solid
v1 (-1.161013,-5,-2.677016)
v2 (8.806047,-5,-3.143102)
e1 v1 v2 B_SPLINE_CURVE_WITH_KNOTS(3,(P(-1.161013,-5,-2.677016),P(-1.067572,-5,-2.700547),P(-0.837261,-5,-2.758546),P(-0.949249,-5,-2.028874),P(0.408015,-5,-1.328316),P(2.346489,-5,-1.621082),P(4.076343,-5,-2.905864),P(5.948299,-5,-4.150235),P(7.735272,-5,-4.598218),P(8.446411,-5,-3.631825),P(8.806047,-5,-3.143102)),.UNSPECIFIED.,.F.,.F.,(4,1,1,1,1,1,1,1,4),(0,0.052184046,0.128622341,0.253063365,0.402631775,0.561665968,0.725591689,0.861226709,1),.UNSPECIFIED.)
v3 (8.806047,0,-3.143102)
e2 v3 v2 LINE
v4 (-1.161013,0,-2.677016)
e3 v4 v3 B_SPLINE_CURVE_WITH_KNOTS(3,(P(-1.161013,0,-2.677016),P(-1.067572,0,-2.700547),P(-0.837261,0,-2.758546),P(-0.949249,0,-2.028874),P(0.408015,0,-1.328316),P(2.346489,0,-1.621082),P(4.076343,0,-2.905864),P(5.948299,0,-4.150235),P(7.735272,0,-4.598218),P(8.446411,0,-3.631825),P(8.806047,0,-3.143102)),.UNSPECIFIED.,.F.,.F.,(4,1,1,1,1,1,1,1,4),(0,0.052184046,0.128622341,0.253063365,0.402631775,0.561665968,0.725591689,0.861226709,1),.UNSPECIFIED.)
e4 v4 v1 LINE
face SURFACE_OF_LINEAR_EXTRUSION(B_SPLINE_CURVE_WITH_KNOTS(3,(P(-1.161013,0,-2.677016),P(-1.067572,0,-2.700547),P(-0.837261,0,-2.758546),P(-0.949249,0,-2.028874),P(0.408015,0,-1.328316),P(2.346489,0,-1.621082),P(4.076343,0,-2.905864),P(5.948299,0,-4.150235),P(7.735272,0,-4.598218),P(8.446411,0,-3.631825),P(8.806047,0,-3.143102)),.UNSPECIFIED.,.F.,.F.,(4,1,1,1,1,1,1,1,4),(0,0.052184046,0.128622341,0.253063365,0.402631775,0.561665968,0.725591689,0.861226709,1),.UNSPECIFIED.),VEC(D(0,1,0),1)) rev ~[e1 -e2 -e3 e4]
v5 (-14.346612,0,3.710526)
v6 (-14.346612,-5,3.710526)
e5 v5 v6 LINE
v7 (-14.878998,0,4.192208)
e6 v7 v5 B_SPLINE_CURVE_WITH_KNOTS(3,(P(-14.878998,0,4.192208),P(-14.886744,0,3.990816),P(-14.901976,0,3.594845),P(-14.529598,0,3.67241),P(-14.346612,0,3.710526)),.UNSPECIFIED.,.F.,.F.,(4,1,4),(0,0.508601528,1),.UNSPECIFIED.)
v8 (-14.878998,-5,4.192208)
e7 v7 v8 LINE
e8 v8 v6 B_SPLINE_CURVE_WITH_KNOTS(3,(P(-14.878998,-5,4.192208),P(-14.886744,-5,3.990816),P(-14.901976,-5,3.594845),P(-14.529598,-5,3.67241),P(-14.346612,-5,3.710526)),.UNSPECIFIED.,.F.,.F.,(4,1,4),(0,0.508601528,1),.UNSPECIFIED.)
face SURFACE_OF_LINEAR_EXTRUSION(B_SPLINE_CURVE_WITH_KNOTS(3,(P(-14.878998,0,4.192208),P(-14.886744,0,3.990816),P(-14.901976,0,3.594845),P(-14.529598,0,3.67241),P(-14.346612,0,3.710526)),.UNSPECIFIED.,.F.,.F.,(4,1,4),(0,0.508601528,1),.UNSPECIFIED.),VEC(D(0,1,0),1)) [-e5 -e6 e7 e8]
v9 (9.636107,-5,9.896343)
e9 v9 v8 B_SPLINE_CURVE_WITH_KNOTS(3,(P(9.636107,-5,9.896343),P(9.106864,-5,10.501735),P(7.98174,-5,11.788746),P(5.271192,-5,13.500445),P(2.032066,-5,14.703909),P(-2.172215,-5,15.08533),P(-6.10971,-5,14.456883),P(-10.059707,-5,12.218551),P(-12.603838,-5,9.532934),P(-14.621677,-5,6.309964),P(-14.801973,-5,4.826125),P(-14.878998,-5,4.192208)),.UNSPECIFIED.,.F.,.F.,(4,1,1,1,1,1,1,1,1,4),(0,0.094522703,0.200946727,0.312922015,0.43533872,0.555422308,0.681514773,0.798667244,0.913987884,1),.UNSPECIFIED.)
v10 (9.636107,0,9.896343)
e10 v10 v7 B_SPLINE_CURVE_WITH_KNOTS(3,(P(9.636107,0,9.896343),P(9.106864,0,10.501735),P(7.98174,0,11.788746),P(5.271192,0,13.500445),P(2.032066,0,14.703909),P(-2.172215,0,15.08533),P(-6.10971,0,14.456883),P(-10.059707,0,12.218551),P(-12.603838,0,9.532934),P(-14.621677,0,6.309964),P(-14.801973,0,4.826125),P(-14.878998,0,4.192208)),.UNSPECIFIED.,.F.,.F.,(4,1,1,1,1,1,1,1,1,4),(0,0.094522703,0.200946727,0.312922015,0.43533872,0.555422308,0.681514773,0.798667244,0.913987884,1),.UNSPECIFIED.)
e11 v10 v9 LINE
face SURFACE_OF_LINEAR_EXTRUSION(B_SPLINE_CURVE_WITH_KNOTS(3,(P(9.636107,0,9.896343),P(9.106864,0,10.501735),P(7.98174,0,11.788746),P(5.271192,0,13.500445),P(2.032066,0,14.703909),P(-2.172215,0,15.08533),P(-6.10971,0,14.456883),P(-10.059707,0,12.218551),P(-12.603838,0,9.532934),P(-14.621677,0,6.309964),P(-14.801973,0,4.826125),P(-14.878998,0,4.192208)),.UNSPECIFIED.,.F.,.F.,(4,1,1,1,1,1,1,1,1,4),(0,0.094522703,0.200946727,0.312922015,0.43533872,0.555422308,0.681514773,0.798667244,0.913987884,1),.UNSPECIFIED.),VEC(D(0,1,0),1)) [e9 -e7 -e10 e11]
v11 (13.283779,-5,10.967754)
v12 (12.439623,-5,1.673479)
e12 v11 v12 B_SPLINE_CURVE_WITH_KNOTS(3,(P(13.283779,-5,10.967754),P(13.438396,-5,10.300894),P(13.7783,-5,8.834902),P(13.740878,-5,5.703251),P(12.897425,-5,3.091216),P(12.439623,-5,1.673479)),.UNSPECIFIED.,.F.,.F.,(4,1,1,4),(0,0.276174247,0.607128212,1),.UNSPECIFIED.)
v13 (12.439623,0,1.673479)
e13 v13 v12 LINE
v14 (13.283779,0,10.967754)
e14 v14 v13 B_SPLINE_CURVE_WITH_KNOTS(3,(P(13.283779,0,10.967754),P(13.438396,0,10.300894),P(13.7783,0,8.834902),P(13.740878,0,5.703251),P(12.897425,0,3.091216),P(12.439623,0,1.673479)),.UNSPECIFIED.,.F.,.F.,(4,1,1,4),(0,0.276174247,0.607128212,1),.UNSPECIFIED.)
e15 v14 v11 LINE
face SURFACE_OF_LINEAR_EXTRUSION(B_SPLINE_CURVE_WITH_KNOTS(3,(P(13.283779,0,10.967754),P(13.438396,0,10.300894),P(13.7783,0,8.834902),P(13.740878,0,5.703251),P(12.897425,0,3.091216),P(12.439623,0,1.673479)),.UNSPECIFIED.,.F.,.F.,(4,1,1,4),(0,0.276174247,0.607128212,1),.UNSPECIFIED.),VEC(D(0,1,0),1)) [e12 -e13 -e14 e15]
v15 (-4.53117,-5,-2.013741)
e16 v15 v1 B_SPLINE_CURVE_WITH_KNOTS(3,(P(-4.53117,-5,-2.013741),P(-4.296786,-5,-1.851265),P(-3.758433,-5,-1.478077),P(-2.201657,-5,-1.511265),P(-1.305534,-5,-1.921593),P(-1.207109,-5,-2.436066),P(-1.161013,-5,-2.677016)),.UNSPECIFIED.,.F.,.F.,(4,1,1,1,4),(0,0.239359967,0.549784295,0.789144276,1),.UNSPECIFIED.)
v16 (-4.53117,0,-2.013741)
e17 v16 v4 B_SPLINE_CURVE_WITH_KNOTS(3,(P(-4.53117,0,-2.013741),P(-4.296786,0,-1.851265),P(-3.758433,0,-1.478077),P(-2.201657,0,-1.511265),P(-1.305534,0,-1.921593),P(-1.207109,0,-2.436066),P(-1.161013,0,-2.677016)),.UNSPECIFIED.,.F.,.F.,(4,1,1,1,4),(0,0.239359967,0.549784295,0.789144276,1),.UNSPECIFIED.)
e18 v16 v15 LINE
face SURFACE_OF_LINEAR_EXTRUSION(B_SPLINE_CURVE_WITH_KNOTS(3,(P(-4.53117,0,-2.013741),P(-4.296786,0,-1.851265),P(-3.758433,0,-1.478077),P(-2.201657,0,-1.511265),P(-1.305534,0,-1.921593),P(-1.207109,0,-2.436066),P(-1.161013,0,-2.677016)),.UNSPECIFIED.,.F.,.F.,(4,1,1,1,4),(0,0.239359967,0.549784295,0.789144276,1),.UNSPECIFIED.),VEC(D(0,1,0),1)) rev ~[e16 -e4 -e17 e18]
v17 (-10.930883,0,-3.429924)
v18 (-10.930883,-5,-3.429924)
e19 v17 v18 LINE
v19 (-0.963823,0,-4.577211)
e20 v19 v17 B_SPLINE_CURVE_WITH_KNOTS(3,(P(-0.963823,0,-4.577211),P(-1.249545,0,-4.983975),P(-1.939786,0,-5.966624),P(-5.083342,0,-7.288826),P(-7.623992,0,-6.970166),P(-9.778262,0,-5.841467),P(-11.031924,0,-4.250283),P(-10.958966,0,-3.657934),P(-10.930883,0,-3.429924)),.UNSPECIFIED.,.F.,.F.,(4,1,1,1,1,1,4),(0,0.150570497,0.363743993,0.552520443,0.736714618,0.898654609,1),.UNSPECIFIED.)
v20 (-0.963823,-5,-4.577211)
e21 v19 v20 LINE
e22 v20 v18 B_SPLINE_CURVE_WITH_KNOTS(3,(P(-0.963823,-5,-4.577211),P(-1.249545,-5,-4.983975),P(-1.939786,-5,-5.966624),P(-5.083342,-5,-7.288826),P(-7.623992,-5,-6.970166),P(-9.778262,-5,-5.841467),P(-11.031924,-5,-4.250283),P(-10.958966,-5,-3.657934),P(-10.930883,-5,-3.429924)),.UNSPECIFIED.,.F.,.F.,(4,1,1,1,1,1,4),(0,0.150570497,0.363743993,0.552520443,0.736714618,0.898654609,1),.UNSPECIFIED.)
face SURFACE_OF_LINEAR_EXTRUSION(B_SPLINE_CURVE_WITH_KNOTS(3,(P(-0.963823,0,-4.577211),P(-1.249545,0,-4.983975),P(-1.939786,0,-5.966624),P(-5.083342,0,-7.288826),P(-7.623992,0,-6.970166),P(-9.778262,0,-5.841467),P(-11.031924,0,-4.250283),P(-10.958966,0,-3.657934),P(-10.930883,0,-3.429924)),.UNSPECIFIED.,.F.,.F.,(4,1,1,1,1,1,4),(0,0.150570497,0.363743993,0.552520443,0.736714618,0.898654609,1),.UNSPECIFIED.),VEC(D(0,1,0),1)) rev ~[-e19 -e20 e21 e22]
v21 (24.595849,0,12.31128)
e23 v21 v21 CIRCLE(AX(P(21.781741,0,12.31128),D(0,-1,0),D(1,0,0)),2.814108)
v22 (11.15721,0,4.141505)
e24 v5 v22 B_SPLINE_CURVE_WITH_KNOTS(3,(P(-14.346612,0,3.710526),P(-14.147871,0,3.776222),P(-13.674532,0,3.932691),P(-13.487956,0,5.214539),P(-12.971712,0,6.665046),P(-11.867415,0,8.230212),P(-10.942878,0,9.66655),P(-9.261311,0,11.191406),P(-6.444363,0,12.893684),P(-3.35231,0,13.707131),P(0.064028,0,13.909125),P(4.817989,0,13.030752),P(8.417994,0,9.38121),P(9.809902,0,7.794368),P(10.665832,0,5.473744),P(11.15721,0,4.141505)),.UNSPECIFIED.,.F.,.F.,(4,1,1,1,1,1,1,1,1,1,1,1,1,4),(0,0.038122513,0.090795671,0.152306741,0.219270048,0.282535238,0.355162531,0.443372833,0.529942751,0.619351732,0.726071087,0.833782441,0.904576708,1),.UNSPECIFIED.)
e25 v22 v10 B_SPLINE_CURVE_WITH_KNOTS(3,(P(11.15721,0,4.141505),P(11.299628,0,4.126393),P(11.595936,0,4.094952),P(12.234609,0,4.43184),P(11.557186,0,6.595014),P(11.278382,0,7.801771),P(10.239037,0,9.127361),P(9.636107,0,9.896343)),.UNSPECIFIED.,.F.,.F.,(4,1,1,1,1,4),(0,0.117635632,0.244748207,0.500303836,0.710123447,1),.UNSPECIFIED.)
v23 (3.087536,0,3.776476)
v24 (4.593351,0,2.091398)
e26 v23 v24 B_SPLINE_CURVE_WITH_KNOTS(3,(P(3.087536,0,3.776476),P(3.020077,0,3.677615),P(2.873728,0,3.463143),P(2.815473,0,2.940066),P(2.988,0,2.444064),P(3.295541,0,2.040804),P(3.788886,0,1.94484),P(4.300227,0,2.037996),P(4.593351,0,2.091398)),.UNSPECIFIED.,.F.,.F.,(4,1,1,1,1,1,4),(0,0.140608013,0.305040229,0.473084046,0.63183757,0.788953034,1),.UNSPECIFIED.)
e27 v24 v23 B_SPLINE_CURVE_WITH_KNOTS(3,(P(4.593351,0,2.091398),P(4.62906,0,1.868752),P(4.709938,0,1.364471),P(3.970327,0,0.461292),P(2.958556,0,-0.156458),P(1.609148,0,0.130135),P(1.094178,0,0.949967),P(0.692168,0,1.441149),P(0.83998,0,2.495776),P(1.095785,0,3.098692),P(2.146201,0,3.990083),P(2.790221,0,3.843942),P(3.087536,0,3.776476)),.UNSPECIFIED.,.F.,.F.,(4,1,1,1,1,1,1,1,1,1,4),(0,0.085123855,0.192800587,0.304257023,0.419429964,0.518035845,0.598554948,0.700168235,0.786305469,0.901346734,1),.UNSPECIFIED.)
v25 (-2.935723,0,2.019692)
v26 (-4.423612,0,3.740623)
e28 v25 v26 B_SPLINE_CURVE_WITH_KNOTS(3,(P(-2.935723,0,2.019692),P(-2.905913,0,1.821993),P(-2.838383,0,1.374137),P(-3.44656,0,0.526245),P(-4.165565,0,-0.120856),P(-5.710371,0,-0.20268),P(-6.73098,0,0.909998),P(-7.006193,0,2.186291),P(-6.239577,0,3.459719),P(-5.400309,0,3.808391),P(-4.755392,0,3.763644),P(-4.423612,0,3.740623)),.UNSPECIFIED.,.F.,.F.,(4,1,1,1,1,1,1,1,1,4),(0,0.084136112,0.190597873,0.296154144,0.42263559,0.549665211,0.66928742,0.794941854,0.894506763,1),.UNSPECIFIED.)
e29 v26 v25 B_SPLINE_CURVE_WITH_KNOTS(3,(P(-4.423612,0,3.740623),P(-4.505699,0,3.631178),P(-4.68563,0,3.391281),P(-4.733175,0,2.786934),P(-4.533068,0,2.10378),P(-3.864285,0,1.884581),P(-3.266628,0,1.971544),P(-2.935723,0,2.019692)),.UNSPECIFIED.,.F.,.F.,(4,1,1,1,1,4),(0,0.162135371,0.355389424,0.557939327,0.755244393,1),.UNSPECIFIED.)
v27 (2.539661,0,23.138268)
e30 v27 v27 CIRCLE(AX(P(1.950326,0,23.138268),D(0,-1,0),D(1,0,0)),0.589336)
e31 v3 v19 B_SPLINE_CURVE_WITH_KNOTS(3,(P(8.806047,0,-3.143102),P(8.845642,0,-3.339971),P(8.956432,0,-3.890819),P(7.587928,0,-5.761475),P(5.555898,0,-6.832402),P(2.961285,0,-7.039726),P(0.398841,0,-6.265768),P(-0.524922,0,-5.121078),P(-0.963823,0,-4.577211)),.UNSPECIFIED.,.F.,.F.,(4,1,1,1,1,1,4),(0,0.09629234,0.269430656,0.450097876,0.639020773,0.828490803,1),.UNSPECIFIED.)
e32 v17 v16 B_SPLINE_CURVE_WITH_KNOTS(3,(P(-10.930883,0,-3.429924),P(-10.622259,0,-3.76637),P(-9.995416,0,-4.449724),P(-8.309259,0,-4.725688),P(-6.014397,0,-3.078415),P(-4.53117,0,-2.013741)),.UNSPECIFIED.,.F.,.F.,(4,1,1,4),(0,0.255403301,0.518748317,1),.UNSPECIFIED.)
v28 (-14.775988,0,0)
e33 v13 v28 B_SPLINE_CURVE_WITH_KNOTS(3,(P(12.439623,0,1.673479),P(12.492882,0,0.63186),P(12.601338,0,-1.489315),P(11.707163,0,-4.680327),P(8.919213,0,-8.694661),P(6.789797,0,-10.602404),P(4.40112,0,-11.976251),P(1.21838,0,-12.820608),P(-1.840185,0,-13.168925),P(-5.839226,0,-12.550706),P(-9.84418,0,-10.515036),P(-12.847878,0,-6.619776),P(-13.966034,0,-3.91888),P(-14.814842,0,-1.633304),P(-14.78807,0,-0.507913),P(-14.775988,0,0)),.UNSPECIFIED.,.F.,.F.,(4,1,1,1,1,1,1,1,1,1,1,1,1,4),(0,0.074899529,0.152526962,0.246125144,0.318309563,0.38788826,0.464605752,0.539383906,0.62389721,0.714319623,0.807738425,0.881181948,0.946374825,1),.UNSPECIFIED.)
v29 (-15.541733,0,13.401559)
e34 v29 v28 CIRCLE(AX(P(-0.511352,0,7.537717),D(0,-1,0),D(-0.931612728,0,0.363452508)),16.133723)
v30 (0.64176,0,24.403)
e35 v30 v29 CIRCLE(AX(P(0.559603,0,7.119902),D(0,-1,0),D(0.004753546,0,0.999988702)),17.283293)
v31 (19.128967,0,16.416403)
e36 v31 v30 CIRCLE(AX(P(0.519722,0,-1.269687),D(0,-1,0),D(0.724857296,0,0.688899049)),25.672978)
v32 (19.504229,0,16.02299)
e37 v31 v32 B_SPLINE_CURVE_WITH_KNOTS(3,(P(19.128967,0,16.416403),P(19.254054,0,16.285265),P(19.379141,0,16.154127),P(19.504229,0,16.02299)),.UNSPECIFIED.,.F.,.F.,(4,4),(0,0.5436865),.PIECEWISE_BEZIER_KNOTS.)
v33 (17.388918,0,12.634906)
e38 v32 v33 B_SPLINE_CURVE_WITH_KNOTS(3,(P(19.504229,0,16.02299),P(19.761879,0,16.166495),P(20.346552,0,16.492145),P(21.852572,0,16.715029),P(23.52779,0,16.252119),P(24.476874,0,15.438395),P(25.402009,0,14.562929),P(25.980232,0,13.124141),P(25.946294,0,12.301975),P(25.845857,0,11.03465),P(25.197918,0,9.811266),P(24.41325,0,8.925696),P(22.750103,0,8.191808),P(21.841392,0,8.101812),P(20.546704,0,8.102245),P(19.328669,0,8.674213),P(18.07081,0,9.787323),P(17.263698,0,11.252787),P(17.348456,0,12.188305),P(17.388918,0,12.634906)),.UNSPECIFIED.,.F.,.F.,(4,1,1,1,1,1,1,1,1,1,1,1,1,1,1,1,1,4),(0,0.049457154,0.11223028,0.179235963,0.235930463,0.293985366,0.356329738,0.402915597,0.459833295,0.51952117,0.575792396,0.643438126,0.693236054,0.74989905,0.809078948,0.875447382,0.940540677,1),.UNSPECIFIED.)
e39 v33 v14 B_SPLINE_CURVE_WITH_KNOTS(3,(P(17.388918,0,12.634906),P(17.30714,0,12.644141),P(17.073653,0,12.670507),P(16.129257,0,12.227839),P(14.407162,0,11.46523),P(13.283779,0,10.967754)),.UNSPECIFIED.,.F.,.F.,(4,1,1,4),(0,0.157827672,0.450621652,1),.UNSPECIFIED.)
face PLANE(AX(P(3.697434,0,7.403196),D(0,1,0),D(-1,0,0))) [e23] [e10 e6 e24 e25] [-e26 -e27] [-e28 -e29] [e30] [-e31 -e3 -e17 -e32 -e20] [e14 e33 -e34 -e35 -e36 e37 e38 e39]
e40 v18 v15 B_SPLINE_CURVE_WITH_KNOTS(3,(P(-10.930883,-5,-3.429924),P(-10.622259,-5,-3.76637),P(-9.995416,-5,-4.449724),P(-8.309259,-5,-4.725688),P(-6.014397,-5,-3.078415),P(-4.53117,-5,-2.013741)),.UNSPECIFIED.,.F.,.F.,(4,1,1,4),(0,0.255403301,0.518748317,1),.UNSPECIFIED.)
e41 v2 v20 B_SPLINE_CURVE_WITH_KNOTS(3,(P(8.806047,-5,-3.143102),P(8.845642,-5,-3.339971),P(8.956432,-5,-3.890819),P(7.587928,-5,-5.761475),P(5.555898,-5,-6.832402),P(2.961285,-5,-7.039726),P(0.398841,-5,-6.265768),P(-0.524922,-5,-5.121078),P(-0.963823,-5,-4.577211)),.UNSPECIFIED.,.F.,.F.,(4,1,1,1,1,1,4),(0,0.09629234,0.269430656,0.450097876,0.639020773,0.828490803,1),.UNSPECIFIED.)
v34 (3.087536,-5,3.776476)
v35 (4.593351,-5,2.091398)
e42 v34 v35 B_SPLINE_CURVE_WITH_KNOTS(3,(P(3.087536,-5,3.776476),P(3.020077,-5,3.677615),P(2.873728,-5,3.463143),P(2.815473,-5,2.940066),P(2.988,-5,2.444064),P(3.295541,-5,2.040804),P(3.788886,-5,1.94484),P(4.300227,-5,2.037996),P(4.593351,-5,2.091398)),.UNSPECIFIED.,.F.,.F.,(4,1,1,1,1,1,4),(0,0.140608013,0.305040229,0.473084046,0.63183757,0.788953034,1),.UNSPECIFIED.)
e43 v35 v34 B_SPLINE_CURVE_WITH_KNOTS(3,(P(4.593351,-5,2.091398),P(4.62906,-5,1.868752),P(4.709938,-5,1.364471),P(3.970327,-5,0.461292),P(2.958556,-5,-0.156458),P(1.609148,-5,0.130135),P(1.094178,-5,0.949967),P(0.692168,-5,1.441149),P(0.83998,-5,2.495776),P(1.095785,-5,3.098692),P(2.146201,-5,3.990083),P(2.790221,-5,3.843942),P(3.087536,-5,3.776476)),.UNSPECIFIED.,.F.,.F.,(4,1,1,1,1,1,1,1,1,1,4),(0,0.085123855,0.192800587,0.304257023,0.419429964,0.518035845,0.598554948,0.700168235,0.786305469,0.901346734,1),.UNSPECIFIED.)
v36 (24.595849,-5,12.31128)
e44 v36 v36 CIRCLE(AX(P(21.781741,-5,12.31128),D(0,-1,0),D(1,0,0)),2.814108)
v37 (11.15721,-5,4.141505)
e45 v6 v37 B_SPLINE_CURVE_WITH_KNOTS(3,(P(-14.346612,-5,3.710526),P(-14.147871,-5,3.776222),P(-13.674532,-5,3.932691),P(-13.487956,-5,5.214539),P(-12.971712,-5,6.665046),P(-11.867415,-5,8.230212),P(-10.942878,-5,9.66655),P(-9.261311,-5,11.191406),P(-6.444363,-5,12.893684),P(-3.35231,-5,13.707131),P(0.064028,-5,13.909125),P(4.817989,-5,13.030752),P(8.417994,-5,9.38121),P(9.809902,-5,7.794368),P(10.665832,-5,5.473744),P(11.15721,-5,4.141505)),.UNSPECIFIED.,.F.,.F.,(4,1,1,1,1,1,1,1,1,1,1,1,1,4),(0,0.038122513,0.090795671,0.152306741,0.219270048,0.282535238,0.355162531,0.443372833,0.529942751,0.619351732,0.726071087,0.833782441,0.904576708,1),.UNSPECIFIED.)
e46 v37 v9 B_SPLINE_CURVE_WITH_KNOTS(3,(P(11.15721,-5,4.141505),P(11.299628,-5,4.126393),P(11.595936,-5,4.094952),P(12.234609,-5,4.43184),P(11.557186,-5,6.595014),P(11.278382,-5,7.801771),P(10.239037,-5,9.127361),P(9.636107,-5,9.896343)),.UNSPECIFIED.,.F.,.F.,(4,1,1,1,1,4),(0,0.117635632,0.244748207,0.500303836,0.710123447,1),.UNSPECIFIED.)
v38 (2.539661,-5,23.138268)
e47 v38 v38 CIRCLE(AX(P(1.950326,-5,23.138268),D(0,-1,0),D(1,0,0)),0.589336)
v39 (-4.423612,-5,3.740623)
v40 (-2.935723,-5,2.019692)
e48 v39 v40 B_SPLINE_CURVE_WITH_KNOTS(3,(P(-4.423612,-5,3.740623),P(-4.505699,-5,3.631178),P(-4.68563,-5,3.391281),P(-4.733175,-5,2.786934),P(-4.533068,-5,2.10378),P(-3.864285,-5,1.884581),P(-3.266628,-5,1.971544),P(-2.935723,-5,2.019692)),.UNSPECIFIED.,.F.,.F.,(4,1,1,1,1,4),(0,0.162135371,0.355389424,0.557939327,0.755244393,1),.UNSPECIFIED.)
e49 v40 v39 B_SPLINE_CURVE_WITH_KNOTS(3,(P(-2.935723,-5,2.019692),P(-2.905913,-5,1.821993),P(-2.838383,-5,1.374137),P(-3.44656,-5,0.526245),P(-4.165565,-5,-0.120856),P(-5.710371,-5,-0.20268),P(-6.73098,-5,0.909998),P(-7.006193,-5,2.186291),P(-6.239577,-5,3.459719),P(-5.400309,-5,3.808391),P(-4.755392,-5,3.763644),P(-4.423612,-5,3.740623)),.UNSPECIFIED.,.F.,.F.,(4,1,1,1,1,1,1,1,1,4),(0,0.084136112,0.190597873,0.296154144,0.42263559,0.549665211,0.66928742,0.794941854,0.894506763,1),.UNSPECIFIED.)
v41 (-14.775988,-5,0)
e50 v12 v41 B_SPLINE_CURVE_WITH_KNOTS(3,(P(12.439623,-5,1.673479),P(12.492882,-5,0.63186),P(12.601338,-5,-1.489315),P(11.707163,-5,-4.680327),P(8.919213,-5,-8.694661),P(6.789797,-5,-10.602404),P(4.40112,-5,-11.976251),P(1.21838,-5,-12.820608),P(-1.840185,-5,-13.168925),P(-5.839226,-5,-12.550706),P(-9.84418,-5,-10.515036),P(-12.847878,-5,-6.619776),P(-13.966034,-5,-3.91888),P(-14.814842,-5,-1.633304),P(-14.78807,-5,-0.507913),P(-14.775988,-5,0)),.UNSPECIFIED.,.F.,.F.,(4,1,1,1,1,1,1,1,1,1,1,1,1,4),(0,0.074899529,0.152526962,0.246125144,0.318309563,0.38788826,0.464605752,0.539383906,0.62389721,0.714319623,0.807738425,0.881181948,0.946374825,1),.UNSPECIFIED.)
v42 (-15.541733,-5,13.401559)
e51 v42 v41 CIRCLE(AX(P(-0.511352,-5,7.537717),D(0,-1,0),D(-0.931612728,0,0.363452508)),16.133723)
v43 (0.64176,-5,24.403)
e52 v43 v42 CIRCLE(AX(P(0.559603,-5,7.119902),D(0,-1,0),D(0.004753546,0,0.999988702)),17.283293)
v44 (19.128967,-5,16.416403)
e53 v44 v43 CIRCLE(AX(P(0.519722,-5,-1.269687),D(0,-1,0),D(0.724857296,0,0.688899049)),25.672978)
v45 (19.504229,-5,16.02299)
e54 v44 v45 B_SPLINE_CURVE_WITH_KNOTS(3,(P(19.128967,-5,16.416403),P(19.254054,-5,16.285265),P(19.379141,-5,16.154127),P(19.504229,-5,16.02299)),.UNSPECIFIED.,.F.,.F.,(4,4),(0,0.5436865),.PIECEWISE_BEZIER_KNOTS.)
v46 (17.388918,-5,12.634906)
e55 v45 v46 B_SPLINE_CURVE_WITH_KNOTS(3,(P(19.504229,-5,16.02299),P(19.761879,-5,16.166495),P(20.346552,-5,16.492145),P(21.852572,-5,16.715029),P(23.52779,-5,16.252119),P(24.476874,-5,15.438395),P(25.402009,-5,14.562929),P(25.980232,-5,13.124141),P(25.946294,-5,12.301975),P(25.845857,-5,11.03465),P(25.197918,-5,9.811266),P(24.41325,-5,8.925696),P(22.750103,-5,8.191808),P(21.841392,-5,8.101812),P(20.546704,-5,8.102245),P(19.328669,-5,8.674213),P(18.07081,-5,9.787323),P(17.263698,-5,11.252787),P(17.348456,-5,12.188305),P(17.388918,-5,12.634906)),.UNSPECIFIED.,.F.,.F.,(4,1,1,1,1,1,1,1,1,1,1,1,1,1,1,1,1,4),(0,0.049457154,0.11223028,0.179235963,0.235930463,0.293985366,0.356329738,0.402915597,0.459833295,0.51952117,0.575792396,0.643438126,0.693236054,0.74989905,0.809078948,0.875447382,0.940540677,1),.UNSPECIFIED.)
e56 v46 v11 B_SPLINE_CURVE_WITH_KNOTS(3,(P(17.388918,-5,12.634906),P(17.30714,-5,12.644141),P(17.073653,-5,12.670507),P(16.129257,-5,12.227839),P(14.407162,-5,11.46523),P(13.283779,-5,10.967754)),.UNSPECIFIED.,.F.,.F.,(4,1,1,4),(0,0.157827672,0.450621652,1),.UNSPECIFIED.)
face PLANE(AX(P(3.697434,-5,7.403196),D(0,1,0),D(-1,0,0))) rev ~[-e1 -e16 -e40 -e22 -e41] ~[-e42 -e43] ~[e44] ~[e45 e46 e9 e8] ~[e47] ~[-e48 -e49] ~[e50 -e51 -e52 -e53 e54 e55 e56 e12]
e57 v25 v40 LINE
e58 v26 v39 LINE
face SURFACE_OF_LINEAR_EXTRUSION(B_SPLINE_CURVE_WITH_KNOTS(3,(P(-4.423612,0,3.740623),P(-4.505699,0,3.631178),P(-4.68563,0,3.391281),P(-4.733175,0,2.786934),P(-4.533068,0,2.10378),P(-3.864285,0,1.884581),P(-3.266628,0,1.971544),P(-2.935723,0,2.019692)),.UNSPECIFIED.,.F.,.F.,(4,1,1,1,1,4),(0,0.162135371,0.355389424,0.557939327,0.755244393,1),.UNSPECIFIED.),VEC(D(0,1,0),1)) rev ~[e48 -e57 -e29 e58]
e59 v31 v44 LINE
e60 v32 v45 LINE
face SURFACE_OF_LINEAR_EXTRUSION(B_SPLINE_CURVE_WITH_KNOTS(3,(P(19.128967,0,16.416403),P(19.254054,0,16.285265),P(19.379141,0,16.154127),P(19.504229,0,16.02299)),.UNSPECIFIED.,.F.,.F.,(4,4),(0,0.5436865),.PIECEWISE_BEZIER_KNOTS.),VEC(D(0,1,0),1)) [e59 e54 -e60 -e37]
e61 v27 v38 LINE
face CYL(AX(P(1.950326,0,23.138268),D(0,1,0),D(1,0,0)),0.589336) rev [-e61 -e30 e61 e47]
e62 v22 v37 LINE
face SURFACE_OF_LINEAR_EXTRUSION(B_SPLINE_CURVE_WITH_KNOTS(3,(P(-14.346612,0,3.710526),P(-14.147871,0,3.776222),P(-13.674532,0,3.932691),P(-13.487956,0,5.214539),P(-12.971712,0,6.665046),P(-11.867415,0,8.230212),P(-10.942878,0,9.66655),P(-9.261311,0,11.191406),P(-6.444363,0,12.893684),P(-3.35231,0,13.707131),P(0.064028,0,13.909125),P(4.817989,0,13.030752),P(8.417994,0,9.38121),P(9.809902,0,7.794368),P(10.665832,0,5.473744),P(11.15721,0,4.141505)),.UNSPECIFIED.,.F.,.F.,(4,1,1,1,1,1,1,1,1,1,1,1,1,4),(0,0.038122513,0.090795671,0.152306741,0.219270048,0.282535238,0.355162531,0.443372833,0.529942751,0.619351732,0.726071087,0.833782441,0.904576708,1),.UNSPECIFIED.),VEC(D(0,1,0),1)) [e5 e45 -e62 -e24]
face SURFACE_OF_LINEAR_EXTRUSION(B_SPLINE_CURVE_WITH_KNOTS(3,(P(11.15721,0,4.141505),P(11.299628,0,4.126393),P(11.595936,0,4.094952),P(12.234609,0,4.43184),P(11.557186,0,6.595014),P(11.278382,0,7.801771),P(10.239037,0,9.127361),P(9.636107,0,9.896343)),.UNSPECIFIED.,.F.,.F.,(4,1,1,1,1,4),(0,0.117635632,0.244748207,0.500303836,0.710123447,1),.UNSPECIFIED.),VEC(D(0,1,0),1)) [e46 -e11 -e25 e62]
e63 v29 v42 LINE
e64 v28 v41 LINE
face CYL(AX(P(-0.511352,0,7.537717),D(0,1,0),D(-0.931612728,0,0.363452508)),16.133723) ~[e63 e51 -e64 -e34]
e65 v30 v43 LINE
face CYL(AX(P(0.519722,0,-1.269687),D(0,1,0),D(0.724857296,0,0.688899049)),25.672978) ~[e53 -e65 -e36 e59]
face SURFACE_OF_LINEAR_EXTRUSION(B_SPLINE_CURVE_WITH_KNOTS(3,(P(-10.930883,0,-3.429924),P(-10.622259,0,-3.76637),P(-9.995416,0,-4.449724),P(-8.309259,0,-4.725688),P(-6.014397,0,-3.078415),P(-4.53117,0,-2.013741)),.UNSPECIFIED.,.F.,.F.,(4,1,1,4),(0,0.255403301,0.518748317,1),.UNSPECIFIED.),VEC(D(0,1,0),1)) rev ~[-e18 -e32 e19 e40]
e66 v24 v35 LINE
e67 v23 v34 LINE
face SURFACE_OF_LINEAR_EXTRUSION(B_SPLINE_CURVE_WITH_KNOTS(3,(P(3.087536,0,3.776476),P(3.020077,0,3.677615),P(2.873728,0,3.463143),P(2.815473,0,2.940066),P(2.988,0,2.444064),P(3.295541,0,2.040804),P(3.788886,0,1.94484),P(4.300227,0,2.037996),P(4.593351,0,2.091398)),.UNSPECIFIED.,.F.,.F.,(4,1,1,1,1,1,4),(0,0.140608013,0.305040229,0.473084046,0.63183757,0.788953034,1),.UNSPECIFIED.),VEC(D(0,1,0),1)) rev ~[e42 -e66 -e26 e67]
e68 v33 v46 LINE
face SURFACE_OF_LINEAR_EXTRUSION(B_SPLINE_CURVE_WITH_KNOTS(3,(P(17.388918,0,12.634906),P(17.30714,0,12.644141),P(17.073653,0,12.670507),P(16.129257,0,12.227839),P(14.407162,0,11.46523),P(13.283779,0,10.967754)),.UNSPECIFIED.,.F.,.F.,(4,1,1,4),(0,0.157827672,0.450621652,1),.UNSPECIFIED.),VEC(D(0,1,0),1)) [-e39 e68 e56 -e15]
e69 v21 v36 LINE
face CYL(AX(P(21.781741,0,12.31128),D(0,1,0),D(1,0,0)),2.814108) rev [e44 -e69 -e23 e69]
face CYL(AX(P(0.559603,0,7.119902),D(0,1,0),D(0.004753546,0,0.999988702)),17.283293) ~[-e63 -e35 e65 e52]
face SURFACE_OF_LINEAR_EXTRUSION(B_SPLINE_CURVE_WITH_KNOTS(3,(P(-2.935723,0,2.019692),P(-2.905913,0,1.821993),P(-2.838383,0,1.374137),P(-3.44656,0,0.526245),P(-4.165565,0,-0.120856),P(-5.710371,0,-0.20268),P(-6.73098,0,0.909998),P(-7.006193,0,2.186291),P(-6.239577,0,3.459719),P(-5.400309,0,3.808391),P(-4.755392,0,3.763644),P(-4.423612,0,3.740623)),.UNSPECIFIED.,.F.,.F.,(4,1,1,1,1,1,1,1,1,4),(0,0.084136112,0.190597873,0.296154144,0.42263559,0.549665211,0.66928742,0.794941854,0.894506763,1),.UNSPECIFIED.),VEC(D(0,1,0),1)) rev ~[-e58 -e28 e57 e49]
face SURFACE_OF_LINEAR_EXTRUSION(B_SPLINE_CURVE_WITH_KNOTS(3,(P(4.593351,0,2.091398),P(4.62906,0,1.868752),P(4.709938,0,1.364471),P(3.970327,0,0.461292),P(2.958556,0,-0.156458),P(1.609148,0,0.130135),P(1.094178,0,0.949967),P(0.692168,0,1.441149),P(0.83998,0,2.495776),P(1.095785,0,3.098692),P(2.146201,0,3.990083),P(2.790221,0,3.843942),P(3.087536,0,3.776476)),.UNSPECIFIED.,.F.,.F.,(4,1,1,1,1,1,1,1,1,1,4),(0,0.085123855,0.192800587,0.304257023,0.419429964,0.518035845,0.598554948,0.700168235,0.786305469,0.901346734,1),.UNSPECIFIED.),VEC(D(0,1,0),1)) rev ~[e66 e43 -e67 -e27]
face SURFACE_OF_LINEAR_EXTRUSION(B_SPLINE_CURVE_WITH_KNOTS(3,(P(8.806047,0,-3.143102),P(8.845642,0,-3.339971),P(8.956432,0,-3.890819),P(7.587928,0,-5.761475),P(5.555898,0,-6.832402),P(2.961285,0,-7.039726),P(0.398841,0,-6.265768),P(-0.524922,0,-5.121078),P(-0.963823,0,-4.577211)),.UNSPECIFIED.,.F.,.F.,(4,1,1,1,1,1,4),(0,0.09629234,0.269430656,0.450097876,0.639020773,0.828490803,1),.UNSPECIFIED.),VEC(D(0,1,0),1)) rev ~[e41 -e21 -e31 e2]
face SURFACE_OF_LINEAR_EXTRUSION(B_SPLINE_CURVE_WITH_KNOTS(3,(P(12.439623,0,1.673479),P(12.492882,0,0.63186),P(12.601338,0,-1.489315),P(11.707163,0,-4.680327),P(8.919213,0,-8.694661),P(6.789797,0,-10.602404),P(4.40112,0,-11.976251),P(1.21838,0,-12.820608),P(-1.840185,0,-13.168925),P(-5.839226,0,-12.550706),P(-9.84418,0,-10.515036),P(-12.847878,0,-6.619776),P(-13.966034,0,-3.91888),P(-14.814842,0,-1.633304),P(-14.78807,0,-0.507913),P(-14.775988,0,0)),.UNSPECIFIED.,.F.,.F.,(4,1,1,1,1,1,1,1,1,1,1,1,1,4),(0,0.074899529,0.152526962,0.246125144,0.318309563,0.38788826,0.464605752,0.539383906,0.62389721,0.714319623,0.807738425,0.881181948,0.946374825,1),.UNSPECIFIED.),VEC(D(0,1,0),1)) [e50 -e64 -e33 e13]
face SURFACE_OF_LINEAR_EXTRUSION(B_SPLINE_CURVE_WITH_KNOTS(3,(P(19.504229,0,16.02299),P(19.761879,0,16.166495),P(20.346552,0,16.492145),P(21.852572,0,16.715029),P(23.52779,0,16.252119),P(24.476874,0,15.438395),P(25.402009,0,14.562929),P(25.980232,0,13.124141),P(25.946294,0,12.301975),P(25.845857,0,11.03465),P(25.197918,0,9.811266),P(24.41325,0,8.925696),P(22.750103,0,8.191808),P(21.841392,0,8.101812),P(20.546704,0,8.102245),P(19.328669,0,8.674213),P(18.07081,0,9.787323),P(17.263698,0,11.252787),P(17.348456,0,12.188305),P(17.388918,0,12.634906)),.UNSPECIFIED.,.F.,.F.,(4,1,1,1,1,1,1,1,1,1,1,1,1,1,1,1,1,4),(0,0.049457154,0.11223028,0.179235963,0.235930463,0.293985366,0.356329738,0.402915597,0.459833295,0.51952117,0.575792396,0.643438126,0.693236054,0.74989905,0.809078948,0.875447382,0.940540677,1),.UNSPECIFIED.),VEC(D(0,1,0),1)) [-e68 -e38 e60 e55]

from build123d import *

# Parameters (mm, degrees)
F0_R     = 0.5893357482
F0_R_2   = 2.8141081842
F1_DEPTH = 5


# Not quite as in the source:
# - a feature names something its author has since deleted; it is built from what else it names


with BuildPart() as f1:
    # F0 (on Front) → F1 (new body)
    with BuildSketch(Plane.XZ):
        with BuildLine():
            add(Edge.make_bspline(
                [(19.1289670765, 16.4164025337), (19.2540542533, 16.2852648646), (19.3791414301, 16.1541271955), (19.5042286068, 16.0229895264)],
                knots=[0, 0, 0, 0, 0.5436865001, 0.5436865001, 0.5436865001, 0.5436865001], degree=3))
            ThreePointArc((19.1289670765, 16.4164025337), (10.7011596535, 22.2980895198), (0.6417595432, 24.4030002505))
            ThreePointArc((0.6417595432, 24.4030002505), (-9.1569529923, 21.4132843748), (-15.5417332426, 13.4015586227))
            ThreePointArc((-15.5417332426, 13.4015586227), (-16.6188020545, 6.6173603775), (-14.7759877145, 0))
            add(Edge.make_bspline(
                [(12.4396234751, 1.6734787496), (12.4928817934, 0.6318597564), (12.6013381428, -1.4893148701), (11.7071630604, -4.680326801), (8.9192131429, -8.6946605769), (6.7897968532, -10.6024037966), (4.4011204199, -11.9762510792), (1.2183804488, -12.8206077461), (-1.8401849358, -13.1689252028), (-5.8392255545, -12.550705577), (-9.8441803584, -10.5150355339), (-12.8478780093, -6.6197758149), (-13.9660340579, -3.9188799674), (-14.8148420498, -1.6333036058), (-14.7880703609, -0.5079132017), (-14.7759877145, 0)],
                knots=[0, 0, 0, 0, 0.0748995289, 0.1525269617, 0.2461251435, 0.3183095626, 0.3878882602, 0.4646057524, 0.5393839055, 0.6238972099, 0.7143196234, 0.8077384253, 0.8811819485, 0.9463748254, 1, 1, 1, 1], degree=3))
            add(Edge.make_bspline(
                [(13.2837789133, 10.9677538276), (13.4383964182, 10.3008942014), (13.7783001215, 8.8349019993), (13.7408778209, 5.7032512612), (12.8974252548, 3.0912162071), (12.4396234751, 1.6734787496)],
                knots=[0, 0, 0, 0, 0.2761742468, 0.6071282117, 1, 1, 1, 1], degree=3))
            add(Edge.make_bspline(
                [(17.3889175057, 12.6349059865), (17.3071399145, 12.6441407774), (17.0736526382, 12.6705074893), (16.1292568481, 12.2278389528), (14.4071616214, 11.4652301296), (13.2837789133, 10.9677538276)],
                knots=[0, 0, 0, 0, 0.157827672, 0.4506216522, 1, 1, 1, 1], degree=3))
            add(Edge.make_bspline(
                [(19.5042286068, 16.0229895264), (19.7618793826, 16.1664952467), (20.3465515008, 16.4921445415), (21.8525723701, 16.715028554), (23.5277898319, 16.2521187136), (24.4768736198, 15.4383952236), (25.4020094443, 14.5629290823), (25.9802324209, 13.1241412335), (25.9462940214, 12.3019745652), (25.8458566723, 11.0346500909), (25.1979175637, 9.8112660026), (24.4132495686, 8.9256962736), (22.7501028456, 8.1918078917), (21.8413916583, 8.1018117524), (20.5467040461, 8.1022445142), (19.3286692564, 8.6742125966), (18.0708096962, 9.787323101), (17.2636977855, 11.2527872126), (17.3484555674, 12.1883053668), (17.3889175057, 12.6349059865)],
                knots=[0, 0, 0, 0, 0.0494571537, 0.1122302804, 0.179235963, 0.2359304627, 0.293985366, 0.3563297379, 0.4029155974, 0.4598332953, 0.5195211699, 0.5757923961, 0.6434381262, 0.6932360544, 0.7498990502, 0.8090789477, 0.8754473822, 0.9405406768, 1, 1, 1, 1], degree=3))
        make_face()
        with BuildLine():
            add(Edge.make_bspline(
                [(-0.9638228221, -4.5772111043), (-1.2495453437, -4.98397497), (-1.9397858162, -5.9666237341), (-5.0833422127, -7.2888256569), (-7.6239923855, -6.970166186), (-9.7782624226, -5.8414669289), (-11.0319235293, -4.2502833325), (-10.9589660125, -3.6579344108), (-10.9308827668, -3.4299239051)],
                knots=[0, 0, 0, 0, 0.150570497, 0.3637439933, 0.5525204428, 0.7367146178, 0.8986546089, 1, 1, 1, 1], degree=3))
            add(Edge.make_bspline(
                [(-10.9308827668, -3.4299239051), (-10.6222594198, -3.7663698968), (-9.995416145, -4.4497236006), (-8.3092593265, -4.7256884897), (-6.0143972146, -3.0784152173), (-4.5311697759, -2.0137408283)],
                knots=[0, 0, 0, 0, 0.2554033012, 0.5187483166, 1, 1, 1, 1], degree=3))
            add(Edge.make_bspline(
                [(-4.5311697759, -2.0137408283), (-4.2967863236, -1.8512654848), (-3.7584325512, -1.4780769629), (-2.2016565057, -1.5112649146), (-1.3055335554, -1.9215931489), (-1.2071093018, -2.436066182), (-1.161012915, -2.6770164259)],
                knots=[0, 0, 0, 0, 0.2393599669, 0.5497842955, 0.7891442761, 1, 1, 1, 1], degree=3))
            add(Edge.make_bspline(
                [(-1.161012915, -2.6770164259), (-1.0675721443, -2.7005474096), (-0.8372609343, -2.7585461751), (-0.9492487174, -2.0288737658), (0.4080149613, -1.3283155357), (2.3464888317, -1.621081544), (4.0763433279, -2.9058644961), (5.9482987592, -4.1502345757), (7.7352715038, -4.5982184912), (8.4464108727, -3.6318248378), (8.8060470298, -3.1431019306)],
                knots=[0, 0, 0, 0, 0.0521840457, 0.1286223414, 0.2530633649, 0.402631775, 0.5616659676, 0.7255916889, 0.8612267092, 1, 1, 1, 1], degree=3))
            add(Edge.make_bspline(
                [(8.8060470298, -3.1431019306), (8.8456422518, -3.3399706171), (8.9564316104, -3.8908187855), (7.5879277489, -5.7614752214), (5.5558981074, -6.8324022566), (2.9612847768, -7.0397264538), (0.3988413132, -6.2657680799), (-0.5249223295, -5.1210784221), (-0.9638228221, -4.5772111043)],
                knots=[0, 0, 0, 0, 0.0962923404, 0.2694306559, 0.450097876, 0.6390207725, 0.8284908028, 1, 1, 1, 1], degree=3))
        make_face(mode=Mode.SUBTRACT)
        with BuildLine():
            add(Edge.make_bspline(
                [(-2.9357231688, 2.0196919795), (-2.905913156, 1.8219933905), (-2.8383829968, 1.3741365811), (-3.4465600278, 0.5262452687), (-4.1655653648, -0.120855501), (-5.7103713292, -0.2026802663), (-6.7309797319, 0.9099976684), (-7.0061932668, 2.1862913586), (-6.2395765771, 3.4597187073), (-5.4003089146, 3.8083914533), (-4.7553924488, 3.7636437948), (-4.4236117974, 3.7406231277)],
                knots=[0, 0, 0, 0, 0.0841361117, 0.190597873, 0.2961541438, 0.4226355898, 0.5496652109, 0.6692874203, 0.7949418536, 0.8945067633, 1, 1, 1, 1], degree=3))
            add(Edge.make_bspline(
                [(-4.4236117974, 3.7406231277), (-4.5056994985, 3.6311775702), (-4.6856300133, 3.3912805423), (-4.7331747586, 2.7869335369), (-4.5330680055, 2.1037799557), (-3.8642846788, 1.8845814454), (-3.2666277247, 1.9715436438), (-2.9357231688, 2.0196919795)],
                knots=[0, 0, 0, 0, 0.162135371, 0.3553894238, 0.5579393274, 0.755244393, 1, 1, 1, 1], degree=3))
        make_face(mode=Mode.SUBTRACT)
        with BuildLine():
            add(Edge.make_bspline(
                [(4.5933509246, 2.0913975313), (4.6290595615, 1.8687515173), (4.7099375499, 1.3644712285), (3.9703271967, 0.4612921887), (2.9585555451, -0.1564583704), (1.6091484533, 0.1301345246), (1.0941784969, 0.9499665974), (0.692167638, 1.4411492785), (0.8399801779, 2.4957761744), (1.0957848097, 3.09869217), (2.1462008326, 3.9900826386), (2.7902208047, 3.8439424494), (3.087536199, 3.77647602)],
                knots=[0, 0, 0, 0, 0.085123855, 0.1928005869, 0.3042570232, 0.4194299636, 0.5180358454, 0.5985549479, 0.7001682351, 0.786305469, 0.9013467338, 1, 1, 1, 1], degree=3))
            add(Edge.make_bspline(
                [(3.087536199, 3.77647602), (3.0200768522, 3.6776153169), (2.8737280477, 3.4631432477), (2.8154727911, 2.9400659536), (2.9879999799, 2.4440641375), (3.2955409371, 2.0408035287), (3.7888857188, 1.9448402237), (4.3002273289, 2.0379963343), (4.5933509246, 2.0913975313)],
                knots=[0, 0, 0, 0, 0.1406080133, 0.3050402295, 0.4730840461, 0.6318375704, 0.7889530345, 1, 1, 1, 1], degree=3))
        make_face(mode=Mode.SUBTRACT)
        with BuildLine():
            add(Edge.make_bspline(
                [(-14.3466116861, 3.710525576), (-14.1478705114, 3.7762222556), (-13.6745324002, 3.9326907995), (-13.4879557887, 5.2145391348), (-12.9717119675, 6.6650458536), (-11.8674148369, 8.2302122455), (-10.9428783287, 9.6665498669), (-9.2613111972, 11.1914063485), (-6.444363323, 12.8936842722), (-3.3523104294, 13.7071314962), (0.0640277441, 13.9091252706), (4.8179887271, 13.0307519837), (8.4179944287, 9.3812096461), (9.8099017521, 7.794368107), (10.665831875, 5.4737442158), (11.157209985, 4.1415048763)],
                knots=[0, 0, 0, 0, 0.038122513, 0.090795671, 0.1523067408, 0.2192700475, 0.2825352378, 0.3551625311, 0.4433728329, 0.5299427508, 0.619351732, 0.7260710873, 0.8337824409, 0.904576708, 1, 1, 1, 1], degree=3))
            add(Edge.make_bspline(
                [(-14.8789975792, 4.1922079399), (-14.8867442966, 3.9908164209), (-14.9019757045, 3.5948452965), (-14.5295976788, 3.6724102677), (-14.3466116861, 3.710525576)],
                knots=[0, 0, 0, 0, 0.5086015283, 1, 1, 1, 1], degree=3))
            add(Edge.make_bspline(
                [(9.6361069009, 9.8963426426), (9.1068635196, 10.5017354525), (7.9817398995, 11.788745879), (5.2711923509, 13.5004449308), (2.0320658811, 14.7039090453), (-2.1722151929, 15.0853302821), (-6.1097101471, 14.4568832336), (-10.059706776, 12.218551294), (-12.6038380306, 9.5329342087), (-14.62167668, 6.30996414), (-14.8019726615, 4.8261245689), (-14.8789975792, 4.1922079399)],
                knots=[0, 0, 0, 0, 0.0945227027, 0.2009467273, 0.3129220147, 0.4353387198, 0.5554223079, 0.6815147731, 0.7986672444, 0.9139878837, 1, 1, 1, 1], degree=3))
            add(Edge.make_bspline(
                [(11.157209985, 4.1415048763), (11.299627538, 4.1263929616), (11.5959360634, 4.0949516886), (12.234608816, 4.4318395759), (11.5571861475, 6.5950141493), (11.2783815639, 7.8017710806), (10.2390366988, 9.1273606709), (9.6361069009, 9.8963426426)],
                knots=[0, 0, 0, 0, 0.1176356321, 0.2447482067, 0.5003038359, 0.7101234467, 1, 1, 1, 1], degree=3))
        make_face(mode=Mode.SUBTRACT)
        with Locations((1.9503255608, 23.1382679194)):
            Circle(F0_R, mode=Mode.SUBTRACT)
        with Locations((21.7817405815, 12.3112803198)):
            Circle(F0_R_2, mode=Mode.SUBTRACT)
    extrude(amount=F1_DEPTH)


solid = f1.part
